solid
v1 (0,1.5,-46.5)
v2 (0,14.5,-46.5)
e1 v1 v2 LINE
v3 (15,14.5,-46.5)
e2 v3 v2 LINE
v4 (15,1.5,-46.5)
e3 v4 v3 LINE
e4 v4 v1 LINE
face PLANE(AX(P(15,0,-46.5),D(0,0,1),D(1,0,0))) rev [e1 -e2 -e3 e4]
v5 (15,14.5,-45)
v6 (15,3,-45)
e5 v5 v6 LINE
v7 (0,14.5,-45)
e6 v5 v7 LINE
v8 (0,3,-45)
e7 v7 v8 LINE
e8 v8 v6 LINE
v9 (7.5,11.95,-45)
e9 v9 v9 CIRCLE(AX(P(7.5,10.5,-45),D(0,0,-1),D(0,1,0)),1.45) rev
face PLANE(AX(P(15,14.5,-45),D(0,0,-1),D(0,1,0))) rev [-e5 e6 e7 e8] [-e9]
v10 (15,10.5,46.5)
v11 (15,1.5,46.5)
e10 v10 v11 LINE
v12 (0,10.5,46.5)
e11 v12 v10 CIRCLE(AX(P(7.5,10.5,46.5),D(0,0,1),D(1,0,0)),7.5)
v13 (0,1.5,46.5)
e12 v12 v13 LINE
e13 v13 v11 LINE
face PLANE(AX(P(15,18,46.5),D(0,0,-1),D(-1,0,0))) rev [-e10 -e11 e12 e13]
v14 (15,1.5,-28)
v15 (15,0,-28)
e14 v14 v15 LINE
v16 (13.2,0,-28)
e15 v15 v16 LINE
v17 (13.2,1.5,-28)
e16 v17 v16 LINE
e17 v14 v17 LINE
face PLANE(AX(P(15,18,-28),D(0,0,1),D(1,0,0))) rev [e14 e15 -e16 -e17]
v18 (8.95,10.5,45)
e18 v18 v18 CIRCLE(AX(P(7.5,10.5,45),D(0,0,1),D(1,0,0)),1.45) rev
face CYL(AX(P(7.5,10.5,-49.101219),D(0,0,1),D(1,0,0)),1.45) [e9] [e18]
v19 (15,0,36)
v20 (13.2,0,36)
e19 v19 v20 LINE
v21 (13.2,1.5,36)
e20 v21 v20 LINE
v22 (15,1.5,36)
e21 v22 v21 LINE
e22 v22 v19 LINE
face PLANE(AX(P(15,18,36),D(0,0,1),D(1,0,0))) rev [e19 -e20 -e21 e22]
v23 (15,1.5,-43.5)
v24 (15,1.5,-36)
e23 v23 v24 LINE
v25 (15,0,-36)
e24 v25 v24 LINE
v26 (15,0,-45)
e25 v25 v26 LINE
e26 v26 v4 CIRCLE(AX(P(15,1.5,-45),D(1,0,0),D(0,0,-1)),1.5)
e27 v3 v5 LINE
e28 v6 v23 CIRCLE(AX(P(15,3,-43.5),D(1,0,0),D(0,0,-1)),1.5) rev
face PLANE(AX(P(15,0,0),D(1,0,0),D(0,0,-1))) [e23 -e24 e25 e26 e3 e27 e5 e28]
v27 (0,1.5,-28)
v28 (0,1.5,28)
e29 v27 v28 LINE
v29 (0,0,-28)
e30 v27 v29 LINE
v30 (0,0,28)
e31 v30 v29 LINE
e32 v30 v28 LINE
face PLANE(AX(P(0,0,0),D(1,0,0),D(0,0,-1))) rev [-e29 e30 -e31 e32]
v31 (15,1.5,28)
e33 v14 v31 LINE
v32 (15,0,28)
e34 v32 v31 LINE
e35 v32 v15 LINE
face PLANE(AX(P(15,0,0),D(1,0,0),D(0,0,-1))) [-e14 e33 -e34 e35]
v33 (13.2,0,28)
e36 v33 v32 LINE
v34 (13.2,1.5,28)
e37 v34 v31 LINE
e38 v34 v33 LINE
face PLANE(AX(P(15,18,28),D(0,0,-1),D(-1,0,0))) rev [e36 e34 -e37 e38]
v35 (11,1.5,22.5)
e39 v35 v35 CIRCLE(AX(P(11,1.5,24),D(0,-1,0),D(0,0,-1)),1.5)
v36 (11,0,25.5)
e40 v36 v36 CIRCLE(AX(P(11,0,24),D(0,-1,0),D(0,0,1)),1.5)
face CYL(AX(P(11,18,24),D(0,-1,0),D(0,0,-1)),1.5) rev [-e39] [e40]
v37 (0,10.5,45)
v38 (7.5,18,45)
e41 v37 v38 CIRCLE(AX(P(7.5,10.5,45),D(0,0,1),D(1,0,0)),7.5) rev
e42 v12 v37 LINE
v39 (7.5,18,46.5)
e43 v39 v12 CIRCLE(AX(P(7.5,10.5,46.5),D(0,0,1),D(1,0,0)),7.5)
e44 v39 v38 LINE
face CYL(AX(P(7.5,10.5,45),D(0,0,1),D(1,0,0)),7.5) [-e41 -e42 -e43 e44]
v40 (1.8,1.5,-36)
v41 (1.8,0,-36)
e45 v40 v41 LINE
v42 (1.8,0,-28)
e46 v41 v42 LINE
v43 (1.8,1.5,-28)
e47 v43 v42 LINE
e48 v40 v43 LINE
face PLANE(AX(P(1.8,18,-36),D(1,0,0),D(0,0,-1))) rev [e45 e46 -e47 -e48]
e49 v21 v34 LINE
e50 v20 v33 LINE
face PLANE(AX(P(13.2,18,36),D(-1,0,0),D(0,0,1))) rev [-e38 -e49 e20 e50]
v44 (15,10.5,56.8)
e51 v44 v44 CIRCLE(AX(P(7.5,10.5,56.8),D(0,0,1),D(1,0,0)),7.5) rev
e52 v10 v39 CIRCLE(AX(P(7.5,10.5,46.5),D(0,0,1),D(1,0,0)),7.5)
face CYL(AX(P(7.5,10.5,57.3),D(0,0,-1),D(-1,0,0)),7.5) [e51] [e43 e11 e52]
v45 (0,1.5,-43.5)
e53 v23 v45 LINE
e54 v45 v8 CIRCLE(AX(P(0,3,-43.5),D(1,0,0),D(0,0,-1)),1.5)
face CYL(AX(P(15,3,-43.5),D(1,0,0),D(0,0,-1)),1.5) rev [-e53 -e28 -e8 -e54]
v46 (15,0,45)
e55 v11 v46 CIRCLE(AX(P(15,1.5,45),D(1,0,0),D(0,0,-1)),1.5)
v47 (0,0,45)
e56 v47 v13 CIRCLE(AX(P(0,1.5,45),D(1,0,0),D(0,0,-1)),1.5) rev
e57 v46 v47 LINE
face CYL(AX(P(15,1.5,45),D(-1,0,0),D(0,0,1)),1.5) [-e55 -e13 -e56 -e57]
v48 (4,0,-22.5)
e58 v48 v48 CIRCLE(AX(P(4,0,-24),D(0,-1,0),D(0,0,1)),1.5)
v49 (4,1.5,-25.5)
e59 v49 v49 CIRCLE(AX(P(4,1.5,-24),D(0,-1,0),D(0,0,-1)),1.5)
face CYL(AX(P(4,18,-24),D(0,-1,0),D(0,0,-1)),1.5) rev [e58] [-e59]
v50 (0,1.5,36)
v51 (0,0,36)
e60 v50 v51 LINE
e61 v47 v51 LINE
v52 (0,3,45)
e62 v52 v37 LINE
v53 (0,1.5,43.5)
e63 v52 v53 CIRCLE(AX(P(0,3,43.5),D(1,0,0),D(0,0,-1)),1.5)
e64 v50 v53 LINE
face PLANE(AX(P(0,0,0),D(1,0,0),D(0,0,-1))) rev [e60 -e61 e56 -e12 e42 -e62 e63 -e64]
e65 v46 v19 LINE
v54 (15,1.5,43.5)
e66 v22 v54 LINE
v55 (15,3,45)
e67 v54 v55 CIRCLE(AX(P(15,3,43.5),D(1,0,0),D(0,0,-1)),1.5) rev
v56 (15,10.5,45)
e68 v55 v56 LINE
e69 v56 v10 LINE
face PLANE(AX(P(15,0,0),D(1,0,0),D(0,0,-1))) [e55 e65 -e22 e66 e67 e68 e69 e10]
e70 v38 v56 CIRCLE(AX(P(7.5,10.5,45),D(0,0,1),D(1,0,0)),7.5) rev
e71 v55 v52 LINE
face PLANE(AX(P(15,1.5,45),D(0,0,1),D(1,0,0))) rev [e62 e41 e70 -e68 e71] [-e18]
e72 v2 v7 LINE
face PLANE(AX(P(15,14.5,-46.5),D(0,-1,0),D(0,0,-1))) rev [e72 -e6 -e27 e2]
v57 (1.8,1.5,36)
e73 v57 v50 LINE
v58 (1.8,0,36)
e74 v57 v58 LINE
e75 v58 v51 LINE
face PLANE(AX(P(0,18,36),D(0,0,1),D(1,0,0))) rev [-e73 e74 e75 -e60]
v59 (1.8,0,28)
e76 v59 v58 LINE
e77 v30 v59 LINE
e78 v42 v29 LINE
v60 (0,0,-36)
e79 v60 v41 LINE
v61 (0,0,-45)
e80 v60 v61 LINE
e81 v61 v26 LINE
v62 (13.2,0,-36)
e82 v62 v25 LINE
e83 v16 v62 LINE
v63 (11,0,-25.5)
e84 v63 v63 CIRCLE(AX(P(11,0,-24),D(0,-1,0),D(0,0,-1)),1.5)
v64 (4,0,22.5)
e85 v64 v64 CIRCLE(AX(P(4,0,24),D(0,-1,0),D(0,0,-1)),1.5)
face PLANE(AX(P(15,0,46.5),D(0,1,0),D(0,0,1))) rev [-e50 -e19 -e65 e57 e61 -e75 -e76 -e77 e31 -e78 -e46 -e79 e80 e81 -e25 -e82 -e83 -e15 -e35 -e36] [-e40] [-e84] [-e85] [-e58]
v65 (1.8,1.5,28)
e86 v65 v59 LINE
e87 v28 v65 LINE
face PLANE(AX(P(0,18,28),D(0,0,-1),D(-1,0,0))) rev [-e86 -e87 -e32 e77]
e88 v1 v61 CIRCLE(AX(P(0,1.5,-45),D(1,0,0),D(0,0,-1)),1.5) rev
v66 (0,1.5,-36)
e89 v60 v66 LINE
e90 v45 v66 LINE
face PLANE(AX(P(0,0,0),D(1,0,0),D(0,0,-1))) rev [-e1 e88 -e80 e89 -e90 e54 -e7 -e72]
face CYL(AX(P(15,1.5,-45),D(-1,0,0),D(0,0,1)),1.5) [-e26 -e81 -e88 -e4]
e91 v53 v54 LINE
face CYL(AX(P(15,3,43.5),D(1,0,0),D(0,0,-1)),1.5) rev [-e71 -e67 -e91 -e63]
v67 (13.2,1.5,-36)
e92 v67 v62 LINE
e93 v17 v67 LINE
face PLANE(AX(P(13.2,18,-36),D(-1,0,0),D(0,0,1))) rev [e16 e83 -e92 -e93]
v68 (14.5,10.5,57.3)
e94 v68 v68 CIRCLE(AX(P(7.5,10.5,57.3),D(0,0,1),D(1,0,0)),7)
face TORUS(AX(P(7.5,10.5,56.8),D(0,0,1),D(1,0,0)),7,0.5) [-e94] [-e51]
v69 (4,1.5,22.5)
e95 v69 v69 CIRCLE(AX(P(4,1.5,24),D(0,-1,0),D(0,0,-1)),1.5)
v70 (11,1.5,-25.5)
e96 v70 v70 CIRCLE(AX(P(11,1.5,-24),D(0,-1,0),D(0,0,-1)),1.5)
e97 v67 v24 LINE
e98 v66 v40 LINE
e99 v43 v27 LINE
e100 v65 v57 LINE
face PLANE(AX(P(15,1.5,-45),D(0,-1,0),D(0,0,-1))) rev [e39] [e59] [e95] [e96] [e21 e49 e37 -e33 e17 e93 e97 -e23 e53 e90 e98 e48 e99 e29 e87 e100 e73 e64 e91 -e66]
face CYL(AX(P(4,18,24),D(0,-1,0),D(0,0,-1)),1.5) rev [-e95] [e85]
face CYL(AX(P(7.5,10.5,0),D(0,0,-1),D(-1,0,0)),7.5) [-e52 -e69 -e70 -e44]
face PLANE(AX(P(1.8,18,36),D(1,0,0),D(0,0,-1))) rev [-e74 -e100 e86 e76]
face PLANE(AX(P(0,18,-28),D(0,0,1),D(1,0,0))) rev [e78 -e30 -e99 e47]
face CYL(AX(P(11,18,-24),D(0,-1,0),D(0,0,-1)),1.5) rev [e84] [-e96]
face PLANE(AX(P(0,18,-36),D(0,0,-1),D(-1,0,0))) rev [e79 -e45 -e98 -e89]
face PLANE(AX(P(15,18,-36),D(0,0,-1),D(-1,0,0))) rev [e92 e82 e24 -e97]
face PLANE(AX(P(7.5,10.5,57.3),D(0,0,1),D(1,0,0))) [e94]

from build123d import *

# Parameters (mm, degrees)
BOSS_EXTRU_1_DEPTH      = 15
CONG_1_R                = 1.5
ESQUISSE2_R             = 7.5
BOSS_EXTRU_2_DEPTH      = 10.8
CONG_2_R                = 7.5
ESQUISSE3_R             = 1.5
ESQUISSE3_W             = 1.8
ESQUISSE3_H             = 8
ENL_V_MAT_EXTRU_1_DEPTH = 62.905492487
ESQUISSE4_R             = 1.45
BOSS_EXTRU_3_DEPTH      = 90
CONG_3_R                = 0.5


with BuildPart() as part:
    # Esquisse1 → Boss.-Extru.1 (new body)
    with BuildSketch(Plane(origin=(0, 0, 0), x_dir=(0, 0, -1), z_dir=(1, 0, 0))):
        Polygon((-46.5, 0), (46.5, 0), (46.5, 14.5), (45, 14.5), (45, 1.5), (-45, 1.5), (-45, 18), (-46.5, 18), align=None)
    extrude(amount=BOSS_EXTRU_1_DEPTH)

    # Congé1
    cong_1_edges = [part.edges().sort_by_distance(p)[0] for p in [
        (7.5, 1.5, 45),
        (7.5, 1.5, -45),
        (7.5, 0, -46.5),
        (7.5, 0, 46.5),
    ]]
    fillet(cong_1_edges, radius=CONG_1_R)

    # Esquisse2 → Boss.-Extru.2 (add)
    with BuildSketch(Plane.XY.offset(46.5)):
        with Locations((7.5, 10.5)):
            Circle(ESQUISSE2_R)
    extrude(amount=BOSS_EXTRU_2_DEPTH)

    # Congé2
    cong_2_edges = [part.edges().sort_by_distance(p)[0] for p in [
        (0, 18, 45.75),
        (15, 18, 45.75),
    ]]
    fillet(cong_2_edges, radius=CONG_2_R - 0.0001)  # a hair under: the kernel refuses the full size

    # Esquisse3 → Enlèv. mat.-Extru.1 (cut, through all)
    with BuildSketch(Plane.XZ):
        with Locations(Location((4, 24, 0), (0, 0, 270))):
            Circle(ESQUISSE3_R)
        with Locations(Location((11, 24, 0), (0, 0, 270))):
            Circle(ESQUISSE3_R)
        with Locations(Location((4, -24, 0), (0, 0, 270))):
            Circle(ESQUISSE3_R)
        with Locations(Location((11, -24, 0), (0, 0, 270))):
            Circle(ESQUISSE3_R)
        with Locations((0.9, 32)):
            Rectangle(ESQUISSE3_W, ESQUISSE3_H)
        with Locations((14.1, 32)):
            Rectangle(ESQUISSE3_W, ESQUISSE3_H)
        with Locations((14.1, -32)):
            Rectangle(ESQUISSE3_W, ESQUISSE3_H)
        with Locations((0.9, -32)):
            Rectangle(ESQUISSE3_W, ESQUISSE3_H)
    extrude(amount=-ENL_V_MAT_EXTRU_1_DEPTH, mode=Mode.SUBTRACT)

    # Esquisse4 → Boss.-Extru.3 (add)
    with BuildSketch(Plane(origin=(0, 0, 45), x_dir=(-1, 0, 0), z_dir=(0, 0, -1))):
        with Locations(Location((-7.5, 10.5, 0), (0, 0, 180))):
            Circle(ESQUISSE4_R)
    extrude(amount=BOSS_EXTRU_3_DEPTH)

    # Congé3
    cong_3_edges = [part.edges().sort_by_distance(p)[0] for p in [
        (0, 10.5, 57.3),
    ]]
    fillet(cong_3_edges, radius=CONG_3_R)


solid = part.part
